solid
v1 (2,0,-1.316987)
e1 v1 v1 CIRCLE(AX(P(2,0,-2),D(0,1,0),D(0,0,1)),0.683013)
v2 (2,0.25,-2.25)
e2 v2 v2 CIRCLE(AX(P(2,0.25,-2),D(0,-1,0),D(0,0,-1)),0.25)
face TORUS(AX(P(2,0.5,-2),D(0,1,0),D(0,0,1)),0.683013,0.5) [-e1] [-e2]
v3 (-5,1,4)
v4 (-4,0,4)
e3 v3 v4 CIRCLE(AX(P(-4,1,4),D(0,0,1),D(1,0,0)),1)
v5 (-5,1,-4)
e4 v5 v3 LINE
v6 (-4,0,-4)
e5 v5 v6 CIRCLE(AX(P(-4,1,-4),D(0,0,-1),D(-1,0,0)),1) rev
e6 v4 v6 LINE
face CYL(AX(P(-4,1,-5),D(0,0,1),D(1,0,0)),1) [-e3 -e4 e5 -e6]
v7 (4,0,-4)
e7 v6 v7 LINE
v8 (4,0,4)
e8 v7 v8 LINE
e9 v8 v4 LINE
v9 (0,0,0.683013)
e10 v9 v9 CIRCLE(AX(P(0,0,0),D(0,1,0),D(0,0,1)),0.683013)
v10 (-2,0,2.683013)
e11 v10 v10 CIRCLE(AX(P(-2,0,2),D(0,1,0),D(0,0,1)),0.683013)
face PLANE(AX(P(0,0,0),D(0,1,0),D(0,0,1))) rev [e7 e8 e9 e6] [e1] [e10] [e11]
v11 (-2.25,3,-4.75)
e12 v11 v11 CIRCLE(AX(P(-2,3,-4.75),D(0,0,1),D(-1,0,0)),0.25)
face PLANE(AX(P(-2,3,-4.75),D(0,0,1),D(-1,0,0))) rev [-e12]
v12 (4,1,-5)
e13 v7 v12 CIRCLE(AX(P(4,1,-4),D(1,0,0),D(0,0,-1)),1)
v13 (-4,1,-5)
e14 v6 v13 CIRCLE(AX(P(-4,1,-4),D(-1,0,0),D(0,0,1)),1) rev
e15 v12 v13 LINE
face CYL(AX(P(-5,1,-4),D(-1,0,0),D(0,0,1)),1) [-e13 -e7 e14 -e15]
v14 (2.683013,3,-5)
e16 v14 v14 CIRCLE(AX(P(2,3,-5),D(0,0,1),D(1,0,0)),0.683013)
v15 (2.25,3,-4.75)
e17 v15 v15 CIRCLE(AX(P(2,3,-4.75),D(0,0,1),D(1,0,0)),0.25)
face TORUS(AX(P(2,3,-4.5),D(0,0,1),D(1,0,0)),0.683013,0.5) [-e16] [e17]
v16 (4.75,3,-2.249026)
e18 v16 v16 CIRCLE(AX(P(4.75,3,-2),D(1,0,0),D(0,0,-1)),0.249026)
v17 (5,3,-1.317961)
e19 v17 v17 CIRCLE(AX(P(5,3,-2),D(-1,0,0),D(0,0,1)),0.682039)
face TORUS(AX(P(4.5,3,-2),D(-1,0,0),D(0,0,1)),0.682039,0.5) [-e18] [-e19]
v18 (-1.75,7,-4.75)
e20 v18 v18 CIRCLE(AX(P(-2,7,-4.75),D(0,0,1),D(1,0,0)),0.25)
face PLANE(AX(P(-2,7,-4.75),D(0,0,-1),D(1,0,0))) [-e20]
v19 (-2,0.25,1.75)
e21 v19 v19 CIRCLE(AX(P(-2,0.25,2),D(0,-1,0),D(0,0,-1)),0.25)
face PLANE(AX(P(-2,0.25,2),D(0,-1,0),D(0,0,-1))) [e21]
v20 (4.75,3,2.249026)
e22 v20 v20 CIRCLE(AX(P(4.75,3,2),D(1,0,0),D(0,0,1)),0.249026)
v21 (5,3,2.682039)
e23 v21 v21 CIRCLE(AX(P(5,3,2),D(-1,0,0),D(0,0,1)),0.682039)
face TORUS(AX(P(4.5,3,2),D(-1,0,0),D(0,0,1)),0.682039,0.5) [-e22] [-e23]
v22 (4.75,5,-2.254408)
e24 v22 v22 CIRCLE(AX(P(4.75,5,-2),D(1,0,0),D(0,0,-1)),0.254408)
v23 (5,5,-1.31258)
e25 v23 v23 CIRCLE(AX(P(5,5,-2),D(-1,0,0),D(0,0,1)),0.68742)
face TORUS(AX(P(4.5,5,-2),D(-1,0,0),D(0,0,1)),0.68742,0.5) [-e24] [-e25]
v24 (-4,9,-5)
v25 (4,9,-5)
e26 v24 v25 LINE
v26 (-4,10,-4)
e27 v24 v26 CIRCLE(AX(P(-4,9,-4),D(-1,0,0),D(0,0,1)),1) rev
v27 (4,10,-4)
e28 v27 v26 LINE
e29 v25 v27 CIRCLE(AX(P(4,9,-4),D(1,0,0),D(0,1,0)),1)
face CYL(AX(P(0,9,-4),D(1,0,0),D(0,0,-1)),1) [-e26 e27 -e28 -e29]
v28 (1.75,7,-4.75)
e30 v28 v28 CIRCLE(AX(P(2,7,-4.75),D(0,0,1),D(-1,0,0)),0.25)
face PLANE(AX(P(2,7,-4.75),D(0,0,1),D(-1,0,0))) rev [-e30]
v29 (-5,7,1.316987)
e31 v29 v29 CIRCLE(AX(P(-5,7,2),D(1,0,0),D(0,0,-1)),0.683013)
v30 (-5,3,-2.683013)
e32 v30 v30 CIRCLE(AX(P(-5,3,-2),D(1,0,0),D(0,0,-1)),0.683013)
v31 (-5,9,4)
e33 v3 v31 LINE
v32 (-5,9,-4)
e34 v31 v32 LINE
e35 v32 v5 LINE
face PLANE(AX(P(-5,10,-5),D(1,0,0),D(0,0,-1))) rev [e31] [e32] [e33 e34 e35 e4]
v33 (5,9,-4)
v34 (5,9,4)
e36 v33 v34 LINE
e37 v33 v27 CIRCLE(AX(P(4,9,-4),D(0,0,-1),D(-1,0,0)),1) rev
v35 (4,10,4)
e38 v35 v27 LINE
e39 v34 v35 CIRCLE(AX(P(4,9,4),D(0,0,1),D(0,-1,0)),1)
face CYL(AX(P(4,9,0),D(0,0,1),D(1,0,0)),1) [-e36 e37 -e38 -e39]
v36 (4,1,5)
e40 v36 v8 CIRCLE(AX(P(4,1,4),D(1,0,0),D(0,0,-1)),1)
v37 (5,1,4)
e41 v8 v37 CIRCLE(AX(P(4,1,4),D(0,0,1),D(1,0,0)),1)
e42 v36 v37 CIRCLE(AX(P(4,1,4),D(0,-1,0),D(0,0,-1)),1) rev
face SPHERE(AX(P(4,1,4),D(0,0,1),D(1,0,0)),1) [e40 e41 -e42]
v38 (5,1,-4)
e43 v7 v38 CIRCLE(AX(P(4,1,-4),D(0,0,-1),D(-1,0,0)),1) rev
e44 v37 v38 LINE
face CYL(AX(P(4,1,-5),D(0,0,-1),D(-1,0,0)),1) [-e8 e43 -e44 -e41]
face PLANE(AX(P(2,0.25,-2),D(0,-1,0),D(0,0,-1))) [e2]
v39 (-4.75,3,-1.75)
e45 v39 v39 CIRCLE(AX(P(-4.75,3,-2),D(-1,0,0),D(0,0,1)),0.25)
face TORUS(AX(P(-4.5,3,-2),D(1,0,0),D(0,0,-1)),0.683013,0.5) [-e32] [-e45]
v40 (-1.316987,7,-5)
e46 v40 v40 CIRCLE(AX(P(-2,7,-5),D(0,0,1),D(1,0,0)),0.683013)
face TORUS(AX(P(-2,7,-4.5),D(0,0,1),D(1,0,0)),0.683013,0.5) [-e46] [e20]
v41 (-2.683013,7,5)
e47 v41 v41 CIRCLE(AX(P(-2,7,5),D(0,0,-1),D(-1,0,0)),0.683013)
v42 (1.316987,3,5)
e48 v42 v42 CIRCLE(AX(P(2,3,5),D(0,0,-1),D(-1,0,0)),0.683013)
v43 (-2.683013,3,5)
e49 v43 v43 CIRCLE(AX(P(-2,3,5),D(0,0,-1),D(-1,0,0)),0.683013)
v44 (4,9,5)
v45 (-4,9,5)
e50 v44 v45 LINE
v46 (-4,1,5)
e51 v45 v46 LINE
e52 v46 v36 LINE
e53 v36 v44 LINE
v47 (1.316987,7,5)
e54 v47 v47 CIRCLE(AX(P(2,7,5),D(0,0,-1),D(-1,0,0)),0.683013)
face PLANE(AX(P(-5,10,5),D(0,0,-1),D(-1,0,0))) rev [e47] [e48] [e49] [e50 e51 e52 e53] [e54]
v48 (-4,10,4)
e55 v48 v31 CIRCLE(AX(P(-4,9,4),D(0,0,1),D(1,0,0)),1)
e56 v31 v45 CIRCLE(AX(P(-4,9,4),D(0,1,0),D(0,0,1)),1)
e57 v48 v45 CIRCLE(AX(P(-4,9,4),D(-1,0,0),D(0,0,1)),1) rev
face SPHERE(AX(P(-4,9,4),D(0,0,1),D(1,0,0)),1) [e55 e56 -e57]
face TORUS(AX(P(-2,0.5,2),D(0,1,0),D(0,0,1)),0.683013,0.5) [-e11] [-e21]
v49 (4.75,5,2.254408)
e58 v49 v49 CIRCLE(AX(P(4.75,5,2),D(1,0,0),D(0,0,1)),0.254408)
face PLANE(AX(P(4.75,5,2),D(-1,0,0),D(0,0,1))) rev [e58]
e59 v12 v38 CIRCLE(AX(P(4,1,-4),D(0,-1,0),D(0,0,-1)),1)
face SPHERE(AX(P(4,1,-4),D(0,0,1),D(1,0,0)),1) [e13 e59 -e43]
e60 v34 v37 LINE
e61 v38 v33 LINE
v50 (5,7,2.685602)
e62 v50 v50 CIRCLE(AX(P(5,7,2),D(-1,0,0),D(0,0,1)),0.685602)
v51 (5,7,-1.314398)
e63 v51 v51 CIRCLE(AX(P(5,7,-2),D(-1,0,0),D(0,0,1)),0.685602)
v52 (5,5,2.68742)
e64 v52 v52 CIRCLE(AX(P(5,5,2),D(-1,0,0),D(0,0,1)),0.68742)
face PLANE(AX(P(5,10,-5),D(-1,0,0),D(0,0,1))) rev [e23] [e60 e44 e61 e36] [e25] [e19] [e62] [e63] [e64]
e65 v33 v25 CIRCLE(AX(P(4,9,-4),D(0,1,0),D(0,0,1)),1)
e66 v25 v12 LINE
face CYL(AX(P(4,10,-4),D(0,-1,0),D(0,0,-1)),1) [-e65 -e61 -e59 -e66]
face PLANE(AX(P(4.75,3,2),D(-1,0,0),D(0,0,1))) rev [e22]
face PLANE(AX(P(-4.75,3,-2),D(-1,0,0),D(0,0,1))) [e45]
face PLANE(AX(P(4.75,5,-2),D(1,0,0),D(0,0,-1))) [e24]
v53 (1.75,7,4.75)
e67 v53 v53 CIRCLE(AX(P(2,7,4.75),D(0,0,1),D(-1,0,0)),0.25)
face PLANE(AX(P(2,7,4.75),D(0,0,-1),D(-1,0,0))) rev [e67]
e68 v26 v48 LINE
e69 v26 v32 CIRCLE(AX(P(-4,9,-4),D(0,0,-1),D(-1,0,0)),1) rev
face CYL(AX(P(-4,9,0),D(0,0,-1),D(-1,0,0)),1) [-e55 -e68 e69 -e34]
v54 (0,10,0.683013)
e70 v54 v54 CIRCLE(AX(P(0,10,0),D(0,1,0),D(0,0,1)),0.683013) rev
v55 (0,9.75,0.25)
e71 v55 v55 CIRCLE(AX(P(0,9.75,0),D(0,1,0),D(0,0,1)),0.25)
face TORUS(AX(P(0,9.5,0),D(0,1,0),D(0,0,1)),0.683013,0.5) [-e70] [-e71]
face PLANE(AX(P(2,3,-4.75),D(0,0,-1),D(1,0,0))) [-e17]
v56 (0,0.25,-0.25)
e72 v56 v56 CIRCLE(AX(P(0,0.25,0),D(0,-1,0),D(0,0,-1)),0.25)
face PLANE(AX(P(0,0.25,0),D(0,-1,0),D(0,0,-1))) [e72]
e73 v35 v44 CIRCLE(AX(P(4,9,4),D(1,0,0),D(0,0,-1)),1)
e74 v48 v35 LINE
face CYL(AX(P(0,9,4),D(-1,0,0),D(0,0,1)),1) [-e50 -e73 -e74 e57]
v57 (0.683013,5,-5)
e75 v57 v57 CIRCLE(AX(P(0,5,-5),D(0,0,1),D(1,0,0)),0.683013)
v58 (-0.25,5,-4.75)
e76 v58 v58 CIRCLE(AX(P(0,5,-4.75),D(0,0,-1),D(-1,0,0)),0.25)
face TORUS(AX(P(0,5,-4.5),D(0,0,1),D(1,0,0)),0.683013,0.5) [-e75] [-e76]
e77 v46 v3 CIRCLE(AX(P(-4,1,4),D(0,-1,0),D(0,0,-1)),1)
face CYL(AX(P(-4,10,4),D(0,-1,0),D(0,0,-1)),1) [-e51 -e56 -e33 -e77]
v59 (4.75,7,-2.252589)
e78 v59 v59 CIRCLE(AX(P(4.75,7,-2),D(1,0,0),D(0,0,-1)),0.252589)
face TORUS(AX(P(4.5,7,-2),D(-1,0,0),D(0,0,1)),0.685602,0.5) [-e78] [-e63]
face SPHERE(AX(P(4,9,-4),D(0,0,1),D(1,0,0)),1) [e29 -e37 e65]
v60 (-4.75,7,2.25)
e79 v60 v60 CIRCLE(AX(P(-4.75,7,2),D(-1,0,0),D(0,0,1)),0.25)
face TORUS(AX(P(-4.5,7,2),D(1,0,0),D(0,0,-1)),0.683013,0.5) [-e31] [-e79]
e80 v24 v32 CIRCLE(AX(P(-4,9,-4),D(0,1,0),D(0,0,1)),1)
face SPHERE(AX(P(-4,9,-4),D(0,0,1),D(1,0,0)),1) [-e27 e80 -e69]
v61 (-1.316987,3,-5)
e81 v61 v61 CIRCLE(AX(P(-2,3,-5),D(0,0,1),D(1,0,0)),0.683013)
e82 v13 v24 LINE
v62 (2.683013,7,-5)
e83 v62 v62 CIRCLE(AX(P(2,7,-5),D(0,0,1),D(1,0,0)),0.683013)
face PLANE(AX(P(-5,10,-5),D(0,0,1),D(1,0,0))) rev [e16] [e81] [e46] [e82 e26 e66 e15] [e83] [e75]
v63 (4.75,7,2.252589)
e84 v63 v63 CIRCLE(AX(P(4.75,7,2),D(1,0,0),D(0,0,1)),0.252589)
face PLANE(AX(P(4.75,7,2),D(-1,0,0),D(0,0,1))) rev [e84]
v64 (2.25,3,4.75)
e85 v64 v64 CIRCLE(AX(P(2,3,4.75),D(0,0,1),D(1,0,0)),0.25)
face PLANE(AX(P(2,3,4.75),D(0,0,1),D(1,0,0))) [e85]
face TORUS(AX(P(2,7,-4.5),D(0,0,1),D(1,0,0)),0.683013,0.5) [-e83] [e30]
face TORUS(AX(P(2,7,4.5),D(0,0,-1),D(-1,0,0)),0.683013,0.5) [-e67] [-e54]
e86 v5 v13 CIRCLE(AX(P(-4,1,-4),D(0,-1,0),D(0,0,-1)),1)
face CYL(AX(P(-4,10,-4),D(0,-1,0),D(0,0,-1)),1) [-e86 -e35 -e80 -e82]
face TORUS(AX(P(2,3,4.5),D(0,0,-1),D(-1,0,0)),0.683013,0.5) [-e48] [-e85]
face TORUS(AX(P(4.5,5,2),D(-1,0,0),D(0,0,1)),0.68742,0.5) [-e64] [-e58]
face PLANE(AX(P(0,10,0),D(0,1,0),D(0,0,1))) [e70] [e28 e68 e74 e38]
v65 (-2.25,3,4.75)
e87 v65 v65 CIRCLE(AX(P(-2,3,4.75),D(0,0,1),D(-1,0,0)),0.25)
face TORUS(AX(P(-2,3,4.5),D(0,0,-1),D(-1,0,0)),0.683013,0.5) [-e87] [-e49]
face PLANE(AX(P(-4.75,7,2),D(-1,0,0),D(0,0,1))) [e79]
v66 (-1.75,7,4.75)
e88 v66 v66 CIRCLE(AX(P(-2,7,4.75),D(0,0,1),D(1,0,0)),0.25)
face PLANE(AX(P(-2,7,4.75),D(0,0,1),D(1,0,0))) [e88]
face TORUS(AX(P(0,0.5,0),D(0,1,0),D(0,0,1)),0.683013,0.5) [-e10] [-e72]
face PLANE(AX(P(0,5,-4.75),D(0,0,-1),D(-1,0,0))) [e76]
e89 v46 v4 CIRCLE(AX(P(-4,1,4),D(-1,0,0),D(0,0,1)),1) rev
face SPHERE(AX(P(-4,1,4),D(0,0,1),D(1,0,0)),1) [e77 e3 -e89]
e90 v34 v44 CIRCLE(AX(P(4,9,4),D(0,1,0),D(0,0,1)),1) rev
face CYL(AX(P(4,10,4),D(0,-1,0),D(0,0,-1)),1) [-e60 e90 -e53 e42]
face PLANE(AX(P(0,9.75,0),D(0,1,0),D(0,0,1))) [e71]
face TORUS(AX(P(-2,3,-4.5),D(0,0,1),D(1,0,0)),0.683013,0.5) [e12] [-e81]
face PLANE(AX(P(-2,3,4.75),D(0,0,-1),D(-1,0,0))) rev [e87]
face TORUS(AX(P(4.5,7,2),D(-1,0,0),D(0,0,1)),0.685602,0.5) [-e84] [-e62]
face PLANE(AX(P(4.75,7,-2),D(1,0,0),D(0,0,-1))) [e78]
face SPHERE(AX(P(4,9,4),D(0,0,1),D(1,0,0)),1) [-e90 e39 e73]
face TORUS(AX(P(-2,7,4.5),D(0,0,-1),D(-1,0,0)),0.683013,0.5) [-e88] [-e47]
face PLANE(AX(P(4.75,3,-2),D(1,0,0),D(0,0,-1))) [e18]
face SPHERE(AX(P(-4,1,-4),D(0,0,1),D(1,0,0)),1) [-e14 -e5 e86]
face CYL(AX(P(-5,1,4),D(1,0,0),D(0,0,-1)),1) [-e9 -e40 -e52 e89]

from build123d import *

# Parameters (mm, degrees)
SKETCH1_W           = 10
SKETCH1_H           = 10
BOSS_EXTRUDE1_DEPTH = 10
FILLET1_R           = 1
SKETCH3_R           = 0.25
CUT_EXTRUDE2_DEPTH  = 0.25
FILLET11_R          = 0.5
SKETCH4_R           = 0.25
CUT_EXTRUDE3_DEPTH  = 0.25
FILLET12_R          = 0.5
SKETCH6_R           = 0.25
CUT_EXTRUDE4_DEPTH  = 0.25
FILLET13_R          = 0.5
SKETCH10_R          = 0.249026036
SKETCH10_R_2        = 0.254407728
SKETCH10_R_3        = 0.252589149
CUT_EXTRUDE6_DEPTH  = 0.25
FILLET15_R          = 0.5
FILLET16_R          = 0.5
SKETCH12_R          = 0.25
CUT_EXTRUDE7_DEPTH  = 0.25
FILLET23_R          = 0.5
SKETCH13_R          = 0.25
CUT_EXTRUDE8_DEPTH  = 0.25
FILLET24_R          = 0.5


with BuildPart() as part:
    # Sketch1 → Boss-Extrude1 (new body)
    with BuildSketch(Plane(origin=(0, 0, 0), x_dir=(1, 0, 0), z_dir=(0, 1, 0))):
        Rectangle(SKETCH1_W, SKETCH1_H)
    extrude(amount=BOSS_EXTRUDE1_DEPTH)

    # Fillet1
    fillet1_edges = [part.edges().sort_by_distance(p)[0] for p in [
        (-5, 10, 0),
        (0, 10, 5),
        (5, 10, 0),
        (0, 0, 5),
        (-5, 0, 0),
        (0, 0, -5),
        (5, 0, 0),
        (5, 5, 5),
        (-5, 5, 5),
        (-5, 5, -5),
        (5, 5, -5),
        (0, 10, -5),
    ]]
    fillet(fillet1_edges, radius=FILLET1_R)

    # Sketch3 → Cut-Extrude2 (cut)
    with BuildSketch(Plane(origin=(0, 10, 0), x_dir=(1, 0, 0), z_dir=(0, 1, 0))):
        with Locations(Location((0, 0, 0), (0, 0, 270))):
            Circle(SKETCH3_R)
    extrude(amount=-CUT_EXTRUDE2_DEPTH, mode=Mode.SUBTRACT)

    # Fillet11
    # the kernel refuses this fillet: 0.5 mm, written as the material it takes off along each edge
    with BuildSketch(Plane(origin=(0, 10, 0), x_dir=(0, 0, 1), z_dir=(-1, 0, 0))) as fillet11_piece_1:
        with BuildLine():
            CenterArc((0.683012702, -0.5), FILLET11_R, 90, 60)
            Line((0.25, -0.25), (0.241339746, -0.245))
            ThreePointArc((0.241339746, -0.245), (0.24, -0.125), (0.24, 0))
            Line((0.24, 0), (0.25, 0.01))
            Line((0.25, 0.01), (0.683012702, 0.01))
            Line((0.683012702, 0.01), (0.683012702, 0))
        make_face()
    revolve(axis=Axis((0, 10, 0), (0, 1, 0)), mode=Mode.SUBTRACT)

    # Sketch4 → Cut-Extrude3 (cut)
    with BuildSketch(Plane.ZY.offset(5)):
        with Locations((2, 7)):
            Circle(SKETCH4_R)
        with Locations((-2, 3)):
            Circle(SKETCH4_R)
    extrude(amount=-CUT_EXTRUDE3_DEPTH, mode=Mode.SUBTRACT)

    # Fillet12
    # the kernel refuses this fillet: 0.5 mm, written as the material it takes off along each edge
    with BuildSketch(Plane(origin=(-5, 7, 2), x_dir=(0, 0, 1), z_dir=(0, -1, 0))) as fillet12_piece_1:
        with BuildLine():
            CenterArc((0.683012702, -0.5), FILLET12_R, 90, 60)
            Line((0.25, -0.25), (0.241339746, -0.245))
            ThreePointArc((0.241339746, -0.245), (0.24, -0.125), (0.24, 0))
            Line((0.24, 0), (0.25, 0.01))
            Line((0.25, 0.01), (0.683012702, 0.01))
            Line((0.683012702, 0.01), (0.683012702, 0))
        make_face()
    revolve(axis=Axis((-5, 7, 2), (-1, 0, 0)), mode=Mode.SUBTRACT)
    with BuildSketch(Plane(origin=(-5, 3, -2), x_dir=(0, 0, 1), z_dir=(0, -1, 0))) as fillet12_piece_2:
        with BuildLine():
            CenterArc((0.683012702, -0.5), FILLET12_R, 90, 60)
            Line((0.25, -0.25), (0.241339746, -0.245))
            ThreePointArc((0.241339746, -0.245), (0.24, -0.125), (0.24, 0))
            Line((0.24, 0), (0.25, 0.01))
            Line((0.25, 0.01), (0.683012702, 0.01))
            Line((0.683012702, 0.01), (0.683012702, 0))
        make_face()
    revolve(axis=Axis((-5, 3, -2), (-1, 0, 0)), mode=Mode.SUBTRACT)

    # Sketch6 → Cut-Extrude4 (cut)
    with BuildSketch(Plane(origin=(0, 0, 0), x_dir=(-1, 0, 0), z_dir=(0, -1, 0))):
        with Locations(Location((0, 0, 0), (0, 0, 90))):
            Circle(SKETCH6_R)
        with Locations(Location((2, -2, 0), (0, 0, 90))):
            Circle(SKETCH6_R)
        with Locations(Location((-2, 2, 0), (0, 0, 90))):
            Circle(SKETCH6_R)
    extrude(amount=-CUT_EXTRUDE4_DEPTH, mode=Mode.SUBTRACT)

    # Fillet13
    # the kernel refuses this fillet: 0.5 mm, written as the material it takes off along each edge
    with BuildSketch(Plane(origin=(2, 0, -2), x_dir=(0, 0, -1), z_dir=(-1, 0, 0))) as fillet13_piece_1:
        with BuildLine():
            CenterArc((0.683012702, -0.5), FILLET13_R, 90, 60)
            Line((0.25, -0.25), (0.241339746, -0.245))
            ThreePointArc((0.241339746, -0.245), (0.24, -0.125), (0.24, 0))
            Line((0.24, 0), (0.25, 0.01))
            Line((0.25, 0.01), (0.683012702, 0.01))
            Line((0.683012702, 0.01), (0.683012702, 0))
        make_face()
    revolve(axis=Axis((2, 0, -2), (0, -1, 0)), mode=Mode.SUBTRACT)
    with BuildSketch(Plane(origin=(-2, 0, 2), x_dir=(0, 0, -1), z_dir=(-1, 0, 0))) as fillet13_piece_2:
        with BuildLine():
            CenterArc((0.683012702, -0.5), FILLET13_R, 90, 60)
            Line((0.25, -0.25), (0.241339746, -0.245))
            ThreePointArc((0.241339746, -0.245), (0.24, -0.125), (0.24, 0))
            Line((0.24, 0), (0.25, 0.01))
            Line((0.25, 0.01), (0.683012702, 0.01))
            Line((0.683012702, 0.01), (0.683012702, 0))
        make_face()
    revolve(axis=Axis((-2, 0, 2), (0, -1, 0)), mode=Mode.SUBTRACT)
    with BuildSketch(Plane(origin=(0, 0, 0), x_dir=(0, 0, -1), z_dir=(-1, 0, 0))) as fillet13_piece_3:
        with BuildLine():
            CenterArc((0.683012702, -0.5), FILLET13_R, 90, 60)
            Line((0.25, -0.25), (0.241339746, -0.245))
            ThreePointArc((0.241339746, -0.245), (0.24, -0.125), (0.24, 0))
            Line((0.24, 0), (0.25, 0.01))
            Line((0.25, 0.01), (0.683012702, 0.01))
            Line((0.683012702, 0.01), (0.683012702, 0))
        make_face()
    revolve(axis=Axis((0, 0, 0), (0, -1, 0)), mode=Mode.SUBTRACT)

    # Sketch10 → Cut-Extrude6 (cut)
    with BuildSketch(Plane(origin=(5, 0, 0), x_dir=(0, 0, -1), z_dir=(1, 0, 0))):
        with Locations((2, 3)):
            Circle(SKETCH10_R)
        with Locations((2, 5)):
            Circle(SKETCH10_R_2)
        with Locations((2, 7)):
            Circle(SKETCH10_R_3)
        with Locations(Location((-2, 7, 0), (0, 0, 180))):
            Circle(SKETCH10_R_3)
        with Locations(Location((-2, 5, 0), (0, 0, 180))):
            Circle(SKETCH10_R_2)
        with Locations(Location((-2, 3, 0), (0, 0, 180))):
            Circle(SKETCH10_R)
    extrude(amount=-CUT_EXTRUDE6_DEPTH, mode=Mode.SUBTRACT)

    # Fillet15
    # the kernel refuses this fillet: 0.5 mm, written as the material it takes off along each edge
    with BuildSketch(Plane(origin=(5, 7, -2), x_dir=(0, 0, -1), z_dir=(0, -1, 0))) as fillet15_piece_1:
        with BuildLine():
            CenterArc((0.685601851, -0.5), FILLET15_R, 90, 60)
            Line((0.252589149, -0.25), (0.243928895, -0.245))
            ThreePointArc((0.243928895, -0.245), (0.242589149, -0.125), (0.242589149, 0))
            Line((0.242589149, 0), (0.252589149, 0.01))
            Line((0.252589149, 0.01), (0.685601851, 0.01))
            Line((0.685601851, 0.01), (0.685601851, 0))
        make_face()
    revolve(axis=Axis((5, 7, -2), (1, 0, 0)), mode=Mode.SUBTRACT)
    with BuildSketch(Plane(origin=(5, 5, -2), x_dir=(0, 0, -1), z_dir=(0, -1, 0))) as fillet15_piece_2:
        with BuildLine():
            CenterArc((0.68742043, -0.5), FILLET15_R, 90, 60)
            Line((0.254407728, -0.25), (0.245747474, -0.245))
            ThreePointArc((0.245747474, -0.245), (0.244407728, -0.125), (0.244407728, 0))
            Line((0.244407728, 0), (0.254407728, 0.01))
            Line((0.254407728, 0.01), (0.68742043, 0.01))
            Line((0.68742043, 0.01), (0.68742043, 0))
        make_face()
    revolve(axis=Axis((5, 5, -2), (1, 0, 0)), mode=Mode.SUBTRACT)
    with BuildSketch(Plane(origin=(5, 3, -2), x_dir=(0, 0, -1), z_dir=(0, -1, 0))) as fillet15_piece_3:
        with BuildLine():
            CenterArc((0.682038738, -0.5), FILLET15_R, 90, 60)
            Line((0.249026036, -0.25), (0.240365782, -0.245))
            ThreePointArc((0.240365782, -0.245), (0.239026036, -0.125), (0.239026036, 0))
            Line((0.239026036, 0), (0.249026036, 0.01))
            Line((0.249026036, 0.01), (0.682038738, 0.01))
            Line((0.682038738, 0.01), (0.682038738, 0))
        make_face()
    revolve(axis=Axis((5, 3, -2), (1, 0, 0)), mode=Mode.SUBTRACT)

    # Fillet16
    # the kernel refuses this fillet: 0.5 mm, written as the material it takes off along each edge
    with BuildSketch(Plane(origin=(5, 5, 2), x_dir=(0, 0, 1), z_dir=(0, 1, 0))) as fillet16_piece_1:
        with BuildLine():
            CenterArc((0.68742043, -0.5), FILLET16_R, 90, 60)
            Line((0.254407728, -0.25), (0.245747474, -0.245))
            ThreePointArc((0.245747474, -0.245), (0.244407728, -0.125), (0.244407728, 0))
            Line((0.244407728, 0), (0.254407728, 0.01))
            Line((0.254407728, 0.01), (0.68742043, 0.01))
            Line((0.68742043, 0.01), (0.68742043, 0))
        make_face()
    revolve(axis=Axis((5, 5, 2), (1, 0, 0)), mode=Mode.SUBTRACT)
    with BuildSketch(Plane(origin=(5, 7, 2), x_dir=(0, 0, 1), z_dir=(0, 1, 0))) as fillet16_piece_2:
        with BuildLine():
            CenterArc((0.685601851, -0.5), FILLET16_R, 90, 60)
            Line((0.252589149, -0.25), (0.243928895, -0.245))
            ThreePointArc((0.243928895, -0.245), (0.242589149, -0.125), (0.242589149, 0))
            Line((0.242589149, 0), (0.252589149, 0.01))
            Line((0.252589149, 0.01), (0.685601851, 0.01))
            Line((0.685601851, 0.01), (0.685601851, 0))
        make_face()
    revolve(axis=Axis((5, 7, 2), (1, 0, 0)), mode=Mode.SUBTRACT)
    with BuildSketch(Plane(origin=(5, 3, 2), x_dir=(0, 0, 1), z_dir=(0, 1, 0))) as fillet16_piece_3:
        with BuildLine():
            CenterArc((0.682038738, -0.5), FILLET16_R, 90, 60)
            Line((0.249026036, -0.25), (0.240365782, -0.245))
            ThreePointArc((0.240365782, -0.245), (0.239026036, -0.125), (0.239026036, 0))
            Line((0.239026036, 0), (0.249026036, 0.01))
            Line((0.249026036, 0.01), (0.682038738, 0.01))
            Line((0.682038738, 0.01), (0.682038738, 0))
        make_face()
    revolve(axis=Axis((5, 3, 2), (1, 0, 0)), mode=Mode.SUBTRACT)

    # Sketch12 → Cut-Extrude7 (cut)
    with BuildSketch(Plane.XY.offset(5)):
        with Locations((2, 3)):
            Circle(SKETCH12_R)
        with Locations((-2, 7)):
            Circle(SKETCH12_R)
        with Locations(Location((-2, 3, 0), (0, 0, 180))):
            Circle(SKETCH12_R)
        with Locations(Location((2, 7, 0), (0, 0, 180))):
            Circle(SKETCH12_R)
    cut_extrude7 = extrude(amount=-CUT_EXTRUDE7_DEPTH, mode=Mode.SUBTRACT)

    # Fillet23
    # the kernel refuses this fillet: 0.5 mm, written as the material it takes off along each edge
    with BuildSketch(Plane(origin=(2, 7, 5), x_dir=(-1, 0, 0), z_dir=(0, 1, 0))) as fillet23_piece_1:
        with BuildLine():
            CenterArc((0.683012702, -0.5), FILLET23_R, 90, 60)
            Line((0.25, -0.25), (0.241339746, -0.245))
            ThreePointArc((0.241339746, -0.245), (0.24, -0.125), (0.24, 0))
            Line((0.24, 0), (0.25, 0.01))
            Line((0.25, 0.01), (0.683012702, 0.01))
            Line((0.683012702, 0.01), (0.683012702, 0))
        make_face()
    revolve(axis=Axis((2, 7, 5), (0, 0, 1)), mode=Mode.SUBTRACT)
    with BuildSketch(Plane(origin=(-2, 3, 5), x_dir=(-1, 0, 0), z_dir=(0, 1, 0))) as fillet23_piece_2:
        with BuildLine():
            CenterArc((0.683012702, -0.5), FILLET23_R, 90, 60)
            Line((0.25, -0.25), (0.241339746, -0.245))
            ThreePointArc((0.241339746, -0.245), (0.24, -0.125), (0.24, 0))
            Line((0.24, 0), (0.25, 0.01))
            Line((0.25, 0.01), (0.683012702, 0.01))
            Line((0.683012702, 0.01), (0.683012702, 0))
        make_face()
    revolve(axis=Axis((-2, 3, 5), (0, 0, 1)), mode=Mode.SUBTRACT)
    with BuildSketch(Plane(origin=(2, 3, 5), x_dir=(1, 0, 0), z_dir=(0, -1, 0))) as fillet23_piece_3:
        with BuildLine():
            CenterArc((0.683012702, -0.5), FILLET23_R, 90, 60)
            Line((0.25, -0.25), (0.241339746, -0.245))
            ThreePointArc((0.241339746, -0.245), (0.24, -0.125), (0.24, 0))
            Line((0.24, 0), (0.25, 0.01))
            Line((0.25, 0.01), (0.683012702, 0.01))
            Line((0.683012702, 0.01), (0.683012702, 0))
        make_face()
    revolve(axis=Axis((2, 3, 5), (0, 0, 1)), mode=Mode.SUBTRACT)
    with BuildSketch(Plane(origin=(-2, 7, 5), x_dir=(1, 0, 0), z_dir=(0, -1, 0))) as fillet23_piece_4:
        with BuildLine():
            CenterArc((0.683012702, -0.5), FILLET23_R, 90, 60)
            Line((0.25, -0.25), (0.241339746, -0.245))
            ThreePointArc((0.241339746, -0.245), (0.24, -0.125), (0.24, 0))
            Line((0.24, 0), (0.25, 0.01))
            Line((0.25, 0.01), (0.683012702, 0.01))
            Line((0.683012702, 0.01), (0.683012702, 0))
        make_face()
    revolve(axis=Axis((-2, 7, 5), (0, 0, 1)), mode=Mode.SUBTRACT)

    # Mirror3: Cut-Extrude7 across plane
    add(cut_extrude7.mirror(Plane.XY), mode=Mode.SUBTRACT)

    # Sketch13 → Cut-Extrude8 (cut)
    with BuildSketch(Plane(origin=(0, 0, -5), x_dir=(-1, 0, 0), z_dir=(0, 0, -1))):
        with Locations((0, 5)):
            Circle(SKETCH13_R)
    extrude(amount=-CUT_EXTRUDE8_DEPTH, mode=Mode.SUBTRACT)

    # Fillet24
    # the kernel refuses this fillet: 0.5 mm, written as the material it takes off along each edge
    with BuildSketch(Plane(origin=(2, 7, -5), x_dir=(-1, 0, 0), z_dir=(0, 1, 0))) as fillet24_piece_1:
        with BuildLine():
            CenterArc((0.683012702, 0.5), FILLET24_R, 210, 60)
            Line((0.25, 0.25), (0.241339746, 0.245))
            ThreePointArc((0.241339746, 0.245), (0.24, 0.125), (0.24, 0))
            Line((0.24, 0), (0.25, -0.01))
            Line((0.25, -0.01), (0.683012702, -0.01))
            Line((0.683012702, -0.01), (0.683012702, 0))
        make_face()
    revolve(axis=Axis((2, 7, -5), (0, 0, 1)), mode=Mode.SUBTRACT)
    with BuildSketch(Plane(origin=(-2, 3, -5), x_dir=(-1, 0, 0), z_dir=(0, 1, 0))) as fillet24_piece_2:
        with BuildLine():
            CenterArc((0.683012702, 0.5), FILLET24_R, 210, 60)
            Line((0.25, 0.25), (0.241339746, 0.245))
            ThreePointArc((0.241339746, 0.245), (0.24, 0.125), (0.24, 0))
            Line((0.24, 0), (0.25, -0.01))
            Line((0.25, -0.01), (0.683012702, -0.01))
            Line((0.683012702, -0.01), (0.683012702, 0))
        make_face()
    revolve(axis=Axis((-2, 3, -5), (0, 0, 1)), mode=Mode.SUBTRACT)
    with BuildSketch(Plane(origin=(2, 3, -5), x_dir=(1, 0, 0), z_dir=(0, -1, 0))) as fillet24_piece_3:
        with BuildLine():
            CenterArc((0.683012702, 0.5), FILLET24_R, 210, 60)
            Line((0.25, 0.25), (0.241339746, 0.245))
            ThreePointArc((0.241339746, 0.245), (0.24, 0.125), (0.24, 0))
            Line((0.24, 0), (0.25, -0.01))
            Line((0.25, -0.01), (0.683012702, -0.01))
            Line((0.683012702, -0.01), (0.683012702, 0))
        make_face()
    revolve(axis=Axis((2, 3, -5), (0, 0, 1)), mode=Mode.SUBTRACT)
    with BuildSketch(Plane(origin=(-2, 7, -5), x_dir=(1, 0, 0), z_dir=(0, -1, 0))) as fillet24_piece_4:
        with BuildLine():
            CenterArc((0.683012702, 0.5), FILLET24_R, 210, 60)
            Line((0.25, 0.25), (0.241339746, 0.245))
            ThreePointArc((0.241339746, 0.245), (0.24, 0.125), (0.24, 0))
            Line((0.24, 0), (0.25, -0.01))
            Line((0.25, -0.01), (0.683012702, -0.01))
            Line((0.683012702, -0.01), (0.683012702, 0))
        make_face()
    revolve(axis=Axis((-2, 7, -5), (0, 0, 1)), mode=Mode.SUBTRACT)
    with BuildSketch(Plane(origin=(0, 5, -5), x_dir=(-1, 0, 0), z_dir=(0, -1, 0))) as fillet24_piece_5:
        with BuildLine():
            CenterArc((0.683012702, -0.5), FILLET24_R, 90, 60)
            Line((0.25, -0.25), (0.241339746, -0.245))
            ThreePointArc((0.241339746, -0.245), (0.24, -0.125), (0.24, 0))
            Line((0.24, 0), (0.25, 0.01))
            Line((0.25, 0.01), (0.683012702, 0.01))
            Line((0.683012702, 0.01), (0.683012702, 0))
        make_face()
    revolve(axis=Axis((0, 5, -5), (0, 0, -1)), mode=Mode.SUBTRACT)


solid = part.part
